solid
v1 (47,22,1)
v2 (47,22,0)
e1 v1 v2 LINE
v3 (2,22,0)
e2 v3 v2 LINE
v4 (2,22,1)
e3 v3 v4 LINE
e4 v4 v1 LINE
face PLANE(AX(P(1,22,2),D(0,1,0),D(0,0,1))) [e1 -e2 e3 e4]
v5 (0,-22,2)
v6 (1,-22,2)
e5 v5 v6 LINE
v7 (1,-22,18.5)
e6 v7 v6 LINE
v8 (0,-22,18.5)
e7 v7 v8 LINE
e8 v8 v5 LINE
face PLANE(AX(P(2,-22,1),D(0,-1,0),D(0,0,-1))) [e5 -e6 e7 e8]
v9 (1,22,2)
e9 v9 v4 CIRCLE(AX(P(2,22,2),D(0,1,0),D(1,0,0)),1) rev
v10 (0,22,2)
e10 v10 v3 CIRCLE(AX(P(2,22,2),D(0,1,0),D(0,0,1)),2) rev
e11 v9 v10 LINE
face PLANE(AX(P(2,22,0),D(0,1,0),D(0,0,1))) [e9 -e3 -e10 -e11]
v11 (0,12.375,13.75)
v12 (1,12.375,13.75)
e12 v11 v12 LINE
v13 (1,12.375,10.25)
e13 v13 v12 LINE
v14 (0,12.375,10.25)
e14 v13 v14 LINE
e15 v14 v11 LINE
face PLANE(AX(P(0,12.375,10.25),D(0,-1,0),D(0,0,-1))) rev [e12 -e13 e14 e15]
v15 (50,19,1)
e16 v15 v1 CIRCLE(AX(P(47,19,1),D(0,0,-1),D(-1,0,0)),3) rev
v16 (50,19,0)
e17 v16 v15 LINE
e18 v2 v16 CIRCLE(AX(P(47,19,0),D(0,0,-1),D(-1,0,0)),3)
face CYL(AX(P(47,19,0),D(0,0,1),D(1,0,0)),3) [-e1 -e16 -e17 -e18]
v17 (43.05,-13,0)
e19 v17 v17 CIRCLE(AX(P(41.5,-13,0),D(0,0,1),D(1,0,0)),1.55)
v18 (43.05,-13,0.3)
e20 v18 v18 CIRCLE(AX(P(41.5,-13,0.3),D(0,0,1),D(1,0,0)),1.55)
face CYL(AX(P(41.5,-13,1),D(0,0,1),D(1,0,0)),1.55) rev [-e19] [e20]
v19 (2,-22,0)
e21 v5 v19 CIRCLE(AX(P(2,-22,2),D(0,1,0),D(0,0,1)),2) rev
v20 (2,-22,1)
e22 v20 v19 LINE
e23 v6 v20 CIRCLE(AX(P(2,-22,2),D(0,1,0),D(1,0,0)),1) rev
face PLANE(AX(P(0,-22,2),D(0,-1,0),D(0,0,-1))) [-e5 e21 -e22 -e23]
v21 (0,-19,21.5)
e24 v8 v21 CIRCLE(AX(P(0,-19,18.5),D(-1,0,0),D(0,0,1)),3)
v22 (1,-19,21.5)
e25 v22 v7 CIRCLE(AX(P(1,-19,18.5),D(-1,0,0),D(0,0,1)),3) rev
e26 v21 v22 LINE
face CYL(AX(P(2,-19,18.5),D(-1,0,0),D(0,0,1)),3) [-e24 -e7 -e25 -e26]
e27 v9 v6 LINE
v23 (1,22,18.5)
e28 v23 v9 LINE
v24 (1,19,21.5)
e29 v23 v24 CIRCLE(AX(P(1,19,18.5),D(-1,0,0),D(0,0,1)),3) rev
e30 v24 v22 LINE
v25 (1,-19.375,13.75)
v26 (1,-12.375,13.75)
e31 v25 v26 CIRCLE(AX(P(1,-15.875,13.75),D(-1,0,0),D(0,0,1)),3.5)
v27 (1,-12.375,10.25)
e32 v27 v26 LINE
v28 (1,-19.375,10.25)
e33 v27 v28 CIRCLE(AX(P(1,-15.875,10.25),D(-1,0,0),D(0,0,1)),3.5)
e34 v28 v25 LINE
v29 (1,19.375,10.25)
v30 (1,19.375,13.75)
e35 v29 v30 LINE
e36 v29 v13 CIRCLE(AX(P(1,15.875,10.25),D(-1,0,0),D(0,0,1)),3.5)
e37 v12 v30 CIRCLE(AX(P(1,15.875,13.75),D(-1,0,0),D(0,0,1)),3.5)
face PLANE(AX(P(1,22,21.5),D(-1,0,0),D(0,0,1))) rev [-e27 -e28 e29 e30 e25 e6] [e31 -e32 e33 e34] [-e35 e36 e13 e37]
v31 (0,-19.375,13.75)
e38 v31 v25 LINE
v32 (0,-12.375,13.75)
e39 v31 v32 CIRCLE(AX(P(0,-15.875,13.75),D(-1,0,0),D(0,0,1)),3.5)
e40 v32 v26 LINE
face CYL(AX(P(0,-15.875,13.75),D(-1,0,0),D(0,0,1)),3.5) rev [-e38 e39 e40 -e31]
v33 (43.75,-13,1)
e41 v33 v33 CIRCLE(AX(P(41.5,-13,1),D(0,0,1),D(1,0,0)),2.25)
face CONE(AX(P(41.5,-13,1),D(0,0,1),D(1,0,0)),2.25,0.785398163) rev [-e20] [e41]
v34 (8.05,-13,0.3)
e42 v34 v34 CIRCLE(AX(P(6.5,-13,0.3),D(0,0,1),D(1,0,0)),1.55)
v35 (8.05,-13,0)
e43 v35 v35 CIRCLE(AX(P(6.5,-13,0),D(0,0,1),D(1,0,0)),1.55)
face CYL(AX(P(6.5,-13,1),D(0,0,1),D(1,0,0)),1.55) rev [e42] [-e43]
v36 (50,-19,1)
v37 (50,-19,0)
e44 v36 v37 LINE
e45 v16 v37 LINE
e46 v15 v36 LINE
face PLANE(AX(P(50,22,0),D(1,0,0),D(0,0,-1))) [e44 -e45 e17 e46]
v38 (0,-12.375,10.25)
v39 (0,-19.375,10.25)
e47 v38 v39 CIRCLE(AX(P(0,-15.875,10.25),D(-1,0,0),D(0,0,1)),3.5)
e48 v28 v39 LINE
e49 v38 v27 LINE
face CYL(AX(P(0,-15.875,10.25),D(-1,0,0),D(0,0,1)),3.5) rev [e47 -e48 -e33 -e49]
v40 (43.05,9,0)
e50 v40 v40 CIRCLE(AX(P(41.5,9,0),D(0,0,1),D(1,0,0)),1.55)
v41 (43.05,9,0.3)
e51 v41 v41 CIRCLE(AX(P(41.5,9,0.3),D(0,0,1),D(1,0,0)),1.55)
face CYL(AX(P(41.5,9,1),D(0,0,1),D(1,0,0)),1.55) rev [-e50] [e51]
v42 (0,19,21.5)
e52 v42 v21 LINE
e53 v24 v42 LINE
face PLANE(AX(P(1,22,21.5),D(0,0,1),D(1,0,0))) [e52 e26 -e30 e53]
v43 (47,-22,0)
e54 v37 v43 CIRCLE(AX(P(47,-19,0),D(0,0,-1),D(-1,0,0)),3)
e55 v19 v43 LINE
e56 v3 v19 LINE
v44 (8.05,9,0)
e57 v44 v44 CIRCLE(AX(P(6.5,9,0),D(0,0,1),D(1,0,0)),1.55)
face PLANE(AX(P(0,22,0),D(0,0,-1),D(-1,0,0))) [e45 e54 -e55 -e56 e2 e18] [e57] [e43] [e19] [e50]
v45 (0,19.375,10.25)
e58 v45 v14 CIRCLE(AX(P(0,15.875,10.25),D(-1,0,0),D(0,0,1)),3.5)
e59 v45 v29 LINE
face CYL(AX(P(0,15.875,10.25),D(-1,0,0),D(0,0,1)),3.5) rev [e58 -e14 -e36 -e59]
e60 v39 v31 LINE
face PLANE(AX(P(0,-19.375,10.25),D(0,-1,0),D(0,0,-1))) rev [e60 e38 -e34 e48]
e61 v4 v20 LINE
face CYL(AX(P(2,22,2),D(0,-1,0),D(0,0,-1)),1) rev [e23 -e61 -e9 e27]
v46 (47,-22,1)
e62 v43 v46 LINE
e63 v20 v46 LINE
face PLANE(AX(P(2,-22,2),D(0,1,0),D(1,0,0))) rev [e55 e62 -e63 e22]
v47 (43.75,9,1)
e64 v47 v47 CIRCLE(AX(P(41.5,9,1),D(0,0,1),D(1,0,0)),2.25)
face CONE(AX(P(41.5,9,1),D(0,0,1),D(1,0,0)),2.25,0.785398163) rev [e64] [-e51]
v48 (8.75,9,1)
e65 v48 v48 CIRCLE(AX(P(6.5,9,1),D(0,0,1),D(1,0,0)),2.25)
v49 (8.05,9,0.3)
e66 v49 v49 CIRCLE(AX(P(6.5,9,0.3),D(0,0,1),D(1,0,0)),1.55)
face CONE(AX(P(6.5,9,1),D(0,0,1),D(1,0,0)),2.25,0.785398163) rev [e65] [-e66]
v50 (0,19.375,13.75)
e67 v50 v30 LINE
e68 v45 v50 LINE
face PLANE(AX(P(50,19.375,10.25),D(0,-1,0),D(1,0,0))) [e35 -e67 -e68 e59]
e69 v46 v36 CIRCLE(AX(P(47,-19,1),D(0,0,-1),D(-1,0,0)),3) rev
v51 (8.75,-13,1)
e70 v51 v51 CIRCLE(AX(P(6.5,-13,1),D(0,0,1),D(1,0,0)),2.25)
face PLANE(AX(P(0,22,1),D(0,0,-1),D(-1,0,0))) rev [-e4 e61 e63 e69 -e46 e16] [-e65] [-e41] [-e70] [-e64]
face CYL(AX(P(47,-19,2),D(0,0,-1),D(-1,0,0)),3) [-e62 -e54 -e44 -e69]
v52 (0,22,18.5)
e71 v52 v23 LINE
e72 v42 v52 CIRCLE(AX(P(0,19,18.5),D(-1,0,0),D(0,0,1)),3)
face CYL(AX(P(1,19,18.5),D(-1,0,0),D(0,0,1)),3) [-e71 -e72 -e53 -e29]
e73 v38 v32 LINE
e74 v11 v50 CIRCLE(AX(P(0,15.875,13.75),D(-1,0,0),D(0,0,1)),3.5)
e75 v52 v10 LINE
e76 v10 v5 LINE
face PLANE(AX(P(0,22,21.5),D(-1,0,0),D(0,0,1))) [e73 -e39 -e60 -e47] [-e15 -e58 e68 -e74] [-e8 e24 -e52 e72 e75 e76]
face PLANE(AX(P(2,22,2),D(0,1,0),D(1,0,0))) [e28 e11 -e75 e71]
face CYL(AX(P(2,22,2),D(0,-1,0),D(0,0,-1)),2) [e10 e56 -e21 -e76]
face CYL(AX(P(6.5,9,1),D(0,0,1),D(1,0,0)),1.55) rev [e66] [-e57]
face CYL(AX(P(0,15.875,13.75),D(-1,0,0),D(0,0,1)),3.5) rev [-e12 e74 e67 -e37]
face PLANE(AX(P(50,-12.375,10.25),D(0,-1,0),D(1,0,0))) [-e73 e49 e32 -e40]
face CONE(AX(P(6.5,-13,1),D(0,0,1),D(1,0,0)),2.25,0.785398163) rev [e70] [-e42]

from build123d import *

# Parameters (mm, degrees)
SM_BASE_FLANGE_1_DEPTH           = 22
FILLET_1_R                       = 3
HOLE_WIZARD_6_8_6_8_1_DEPTH      = 1
HOLE_WIZARD_3_1_3_1_1_AT_2_COUNT = 2
HOLE_WIZARD_3_1_3_1_1_AT_2_PITCH = 41.340053217
HOLE_WIZARD_3_1_3_1_1_AT_3_COUNT = 2
HOLE_WIZARD_3_1_3_1_1_AT_3_PITCH = 22
HOLE_WIZARD_3_1_3_1_1_AT_4_COUNT = 2
HOLE_WIZARD_3_1_3_1_1_AT_4_PITCH = 35


# Read off the part's stored shape, not the designer's step: Диаметр отверстия Ø6.8 (6.8)1
# Sheet-metal steps are written as plain solids
with BuildPart() as part:
    # Sketch 1 → Базовая кромка1 (new, symmetric)
    with BuildSketch(Plane(origin=(0, 0, 0), x_dir=(1, 0, 0), z_dir=(0, 1, 0))):
        with BuildLine():
            Line((0, -21.5), (0, -2))
            ThreePointArc((0, -2), (0.585786438, -0.585786438), (2, 0))
            Line((2, 0), (50, 0))
            Line((50, 0), (50, -1))
            Line((50, -1), (2, -1))
            ThreePointArc((2, -1), (1.292893219, -1.292893219), (1, -2))
            Line((1, -2), (1, -21.5))
            Line((1, -21.5), (0, -21.5))
        make_face()
    extrude(amount=SM_BASE_FLANGE_1_DEPTH, both=True)

    # Скругление1
    fillet_1_edges = [part.edges().sort_by_distance(p)[0] for p in [
        (0.5, 22, 21.5),
        (0.5, -22, 21.5),
        (50, 22, 0.5),
        (50, -22, 0.5),
    ]]
    fillet(fillet_1_edges, radius=FILLET_1_R)

    # Диаметр отверстия Ø6.8 (6.8)1 outline → Диаметр отверстия Ø6.8 (6.8)1 (cut)
    with BuildSketch(Plane.YZ):
        with BuildLine():
            Line((-12.375, 10.25), (-12.375, 13.75))
            ThreePointArc((-12.375, 13.75), (-15.875, 17.25), (-19.375, 13.75))
            Line((-19.375, 13.75), (-19.375, 10.25))
            ThreePointArc((-19.375, 10.25), (-15.875, 6.75), (-12.375, 10.25))
        make_face()
        with BuildLine():
            ThreePointArc((19.375, 13.75), (15.875, 17.25), (12.375, 13.75))
            Line((12.375, 13.75), (12.375, 10.25))
            ThreePointArc((12.375, 10.25), (15.875, 6.75), (19.375, 10.25))
            Line((19.375, 10.25), (19.375, 13.75))
        make_face()
    extrude(amount=HOLE_WIZARD_6_8_6_8_1_DEPTH, mode=Mode.SUBTRACT)

    # Эскиз5 → Диаметр отверстия Ø3.1 (3.1)1 (revolve, cut)
    with BuildSketch(Plane(origin=(6.5, 9, 1), x_dir=(0, -1, 0), z_dir=(1, 0, 0))):
        Polygon((0, 0), (0, 1), (1.55, 1), (1.55, 0.7), (2.25, 0), align=None)
    hole_wizard_3_1_3_1_1 = revolve(axis=Axis((6.5, 9, 7.35), (0, 0, -1)), mode=Mode.SUBTRACT)

    # Диаметр отверстия Ø3.1 (3.1)1 at 2: Диаметр отверстия Ø3.1 (3.1)1 ×2
    with Locations(*[Vector(0.8466365492110047, -0.5321715452183459, 0) * (i * HOLE_WIZARD_3_1_3_1_1_AT_2_PITCH) for i in range(1, HOLE_WIZARD_3_1_3_1_1_AT_2_COUNT)]):
        add(hole_wizard_3_1_3_1_1, mode=Mode.SUBTRACT)

    # Диаметр отверстия Ø3.1 (3.1)1 at 3: Диаметр отверстия Ø3.1 (3.1)1 ×2
    with Locations(*[(0, -i * HOLE_WIZARD_3_1_3_1_1_AT_3_PITCH, 0) for i in range(1, HOLE_WIZARD_3_1_3_1_1_AT_3_COUNT)]):
        add(hole_wizard_3_1_3_1_1, mode=Mode.SUBTRACT)

    # Диаметр отверстия Ø3.1 (3.1)1 at 4: Диаметр отверстия Ø3.1 (3.1)1 ×2
    with Locations(*[(i * HOLE_WIZARD_3_1_3_1_1_AT_4_PITCH, 0, 0) for i in range(1, HOLE_WIZARD_3_1_3_1_1_AT_4_COUNT)]):
        add(hole_wizard_3_1_3_1_1, mode=Mode.SUBTRACT)


solid = part.part
